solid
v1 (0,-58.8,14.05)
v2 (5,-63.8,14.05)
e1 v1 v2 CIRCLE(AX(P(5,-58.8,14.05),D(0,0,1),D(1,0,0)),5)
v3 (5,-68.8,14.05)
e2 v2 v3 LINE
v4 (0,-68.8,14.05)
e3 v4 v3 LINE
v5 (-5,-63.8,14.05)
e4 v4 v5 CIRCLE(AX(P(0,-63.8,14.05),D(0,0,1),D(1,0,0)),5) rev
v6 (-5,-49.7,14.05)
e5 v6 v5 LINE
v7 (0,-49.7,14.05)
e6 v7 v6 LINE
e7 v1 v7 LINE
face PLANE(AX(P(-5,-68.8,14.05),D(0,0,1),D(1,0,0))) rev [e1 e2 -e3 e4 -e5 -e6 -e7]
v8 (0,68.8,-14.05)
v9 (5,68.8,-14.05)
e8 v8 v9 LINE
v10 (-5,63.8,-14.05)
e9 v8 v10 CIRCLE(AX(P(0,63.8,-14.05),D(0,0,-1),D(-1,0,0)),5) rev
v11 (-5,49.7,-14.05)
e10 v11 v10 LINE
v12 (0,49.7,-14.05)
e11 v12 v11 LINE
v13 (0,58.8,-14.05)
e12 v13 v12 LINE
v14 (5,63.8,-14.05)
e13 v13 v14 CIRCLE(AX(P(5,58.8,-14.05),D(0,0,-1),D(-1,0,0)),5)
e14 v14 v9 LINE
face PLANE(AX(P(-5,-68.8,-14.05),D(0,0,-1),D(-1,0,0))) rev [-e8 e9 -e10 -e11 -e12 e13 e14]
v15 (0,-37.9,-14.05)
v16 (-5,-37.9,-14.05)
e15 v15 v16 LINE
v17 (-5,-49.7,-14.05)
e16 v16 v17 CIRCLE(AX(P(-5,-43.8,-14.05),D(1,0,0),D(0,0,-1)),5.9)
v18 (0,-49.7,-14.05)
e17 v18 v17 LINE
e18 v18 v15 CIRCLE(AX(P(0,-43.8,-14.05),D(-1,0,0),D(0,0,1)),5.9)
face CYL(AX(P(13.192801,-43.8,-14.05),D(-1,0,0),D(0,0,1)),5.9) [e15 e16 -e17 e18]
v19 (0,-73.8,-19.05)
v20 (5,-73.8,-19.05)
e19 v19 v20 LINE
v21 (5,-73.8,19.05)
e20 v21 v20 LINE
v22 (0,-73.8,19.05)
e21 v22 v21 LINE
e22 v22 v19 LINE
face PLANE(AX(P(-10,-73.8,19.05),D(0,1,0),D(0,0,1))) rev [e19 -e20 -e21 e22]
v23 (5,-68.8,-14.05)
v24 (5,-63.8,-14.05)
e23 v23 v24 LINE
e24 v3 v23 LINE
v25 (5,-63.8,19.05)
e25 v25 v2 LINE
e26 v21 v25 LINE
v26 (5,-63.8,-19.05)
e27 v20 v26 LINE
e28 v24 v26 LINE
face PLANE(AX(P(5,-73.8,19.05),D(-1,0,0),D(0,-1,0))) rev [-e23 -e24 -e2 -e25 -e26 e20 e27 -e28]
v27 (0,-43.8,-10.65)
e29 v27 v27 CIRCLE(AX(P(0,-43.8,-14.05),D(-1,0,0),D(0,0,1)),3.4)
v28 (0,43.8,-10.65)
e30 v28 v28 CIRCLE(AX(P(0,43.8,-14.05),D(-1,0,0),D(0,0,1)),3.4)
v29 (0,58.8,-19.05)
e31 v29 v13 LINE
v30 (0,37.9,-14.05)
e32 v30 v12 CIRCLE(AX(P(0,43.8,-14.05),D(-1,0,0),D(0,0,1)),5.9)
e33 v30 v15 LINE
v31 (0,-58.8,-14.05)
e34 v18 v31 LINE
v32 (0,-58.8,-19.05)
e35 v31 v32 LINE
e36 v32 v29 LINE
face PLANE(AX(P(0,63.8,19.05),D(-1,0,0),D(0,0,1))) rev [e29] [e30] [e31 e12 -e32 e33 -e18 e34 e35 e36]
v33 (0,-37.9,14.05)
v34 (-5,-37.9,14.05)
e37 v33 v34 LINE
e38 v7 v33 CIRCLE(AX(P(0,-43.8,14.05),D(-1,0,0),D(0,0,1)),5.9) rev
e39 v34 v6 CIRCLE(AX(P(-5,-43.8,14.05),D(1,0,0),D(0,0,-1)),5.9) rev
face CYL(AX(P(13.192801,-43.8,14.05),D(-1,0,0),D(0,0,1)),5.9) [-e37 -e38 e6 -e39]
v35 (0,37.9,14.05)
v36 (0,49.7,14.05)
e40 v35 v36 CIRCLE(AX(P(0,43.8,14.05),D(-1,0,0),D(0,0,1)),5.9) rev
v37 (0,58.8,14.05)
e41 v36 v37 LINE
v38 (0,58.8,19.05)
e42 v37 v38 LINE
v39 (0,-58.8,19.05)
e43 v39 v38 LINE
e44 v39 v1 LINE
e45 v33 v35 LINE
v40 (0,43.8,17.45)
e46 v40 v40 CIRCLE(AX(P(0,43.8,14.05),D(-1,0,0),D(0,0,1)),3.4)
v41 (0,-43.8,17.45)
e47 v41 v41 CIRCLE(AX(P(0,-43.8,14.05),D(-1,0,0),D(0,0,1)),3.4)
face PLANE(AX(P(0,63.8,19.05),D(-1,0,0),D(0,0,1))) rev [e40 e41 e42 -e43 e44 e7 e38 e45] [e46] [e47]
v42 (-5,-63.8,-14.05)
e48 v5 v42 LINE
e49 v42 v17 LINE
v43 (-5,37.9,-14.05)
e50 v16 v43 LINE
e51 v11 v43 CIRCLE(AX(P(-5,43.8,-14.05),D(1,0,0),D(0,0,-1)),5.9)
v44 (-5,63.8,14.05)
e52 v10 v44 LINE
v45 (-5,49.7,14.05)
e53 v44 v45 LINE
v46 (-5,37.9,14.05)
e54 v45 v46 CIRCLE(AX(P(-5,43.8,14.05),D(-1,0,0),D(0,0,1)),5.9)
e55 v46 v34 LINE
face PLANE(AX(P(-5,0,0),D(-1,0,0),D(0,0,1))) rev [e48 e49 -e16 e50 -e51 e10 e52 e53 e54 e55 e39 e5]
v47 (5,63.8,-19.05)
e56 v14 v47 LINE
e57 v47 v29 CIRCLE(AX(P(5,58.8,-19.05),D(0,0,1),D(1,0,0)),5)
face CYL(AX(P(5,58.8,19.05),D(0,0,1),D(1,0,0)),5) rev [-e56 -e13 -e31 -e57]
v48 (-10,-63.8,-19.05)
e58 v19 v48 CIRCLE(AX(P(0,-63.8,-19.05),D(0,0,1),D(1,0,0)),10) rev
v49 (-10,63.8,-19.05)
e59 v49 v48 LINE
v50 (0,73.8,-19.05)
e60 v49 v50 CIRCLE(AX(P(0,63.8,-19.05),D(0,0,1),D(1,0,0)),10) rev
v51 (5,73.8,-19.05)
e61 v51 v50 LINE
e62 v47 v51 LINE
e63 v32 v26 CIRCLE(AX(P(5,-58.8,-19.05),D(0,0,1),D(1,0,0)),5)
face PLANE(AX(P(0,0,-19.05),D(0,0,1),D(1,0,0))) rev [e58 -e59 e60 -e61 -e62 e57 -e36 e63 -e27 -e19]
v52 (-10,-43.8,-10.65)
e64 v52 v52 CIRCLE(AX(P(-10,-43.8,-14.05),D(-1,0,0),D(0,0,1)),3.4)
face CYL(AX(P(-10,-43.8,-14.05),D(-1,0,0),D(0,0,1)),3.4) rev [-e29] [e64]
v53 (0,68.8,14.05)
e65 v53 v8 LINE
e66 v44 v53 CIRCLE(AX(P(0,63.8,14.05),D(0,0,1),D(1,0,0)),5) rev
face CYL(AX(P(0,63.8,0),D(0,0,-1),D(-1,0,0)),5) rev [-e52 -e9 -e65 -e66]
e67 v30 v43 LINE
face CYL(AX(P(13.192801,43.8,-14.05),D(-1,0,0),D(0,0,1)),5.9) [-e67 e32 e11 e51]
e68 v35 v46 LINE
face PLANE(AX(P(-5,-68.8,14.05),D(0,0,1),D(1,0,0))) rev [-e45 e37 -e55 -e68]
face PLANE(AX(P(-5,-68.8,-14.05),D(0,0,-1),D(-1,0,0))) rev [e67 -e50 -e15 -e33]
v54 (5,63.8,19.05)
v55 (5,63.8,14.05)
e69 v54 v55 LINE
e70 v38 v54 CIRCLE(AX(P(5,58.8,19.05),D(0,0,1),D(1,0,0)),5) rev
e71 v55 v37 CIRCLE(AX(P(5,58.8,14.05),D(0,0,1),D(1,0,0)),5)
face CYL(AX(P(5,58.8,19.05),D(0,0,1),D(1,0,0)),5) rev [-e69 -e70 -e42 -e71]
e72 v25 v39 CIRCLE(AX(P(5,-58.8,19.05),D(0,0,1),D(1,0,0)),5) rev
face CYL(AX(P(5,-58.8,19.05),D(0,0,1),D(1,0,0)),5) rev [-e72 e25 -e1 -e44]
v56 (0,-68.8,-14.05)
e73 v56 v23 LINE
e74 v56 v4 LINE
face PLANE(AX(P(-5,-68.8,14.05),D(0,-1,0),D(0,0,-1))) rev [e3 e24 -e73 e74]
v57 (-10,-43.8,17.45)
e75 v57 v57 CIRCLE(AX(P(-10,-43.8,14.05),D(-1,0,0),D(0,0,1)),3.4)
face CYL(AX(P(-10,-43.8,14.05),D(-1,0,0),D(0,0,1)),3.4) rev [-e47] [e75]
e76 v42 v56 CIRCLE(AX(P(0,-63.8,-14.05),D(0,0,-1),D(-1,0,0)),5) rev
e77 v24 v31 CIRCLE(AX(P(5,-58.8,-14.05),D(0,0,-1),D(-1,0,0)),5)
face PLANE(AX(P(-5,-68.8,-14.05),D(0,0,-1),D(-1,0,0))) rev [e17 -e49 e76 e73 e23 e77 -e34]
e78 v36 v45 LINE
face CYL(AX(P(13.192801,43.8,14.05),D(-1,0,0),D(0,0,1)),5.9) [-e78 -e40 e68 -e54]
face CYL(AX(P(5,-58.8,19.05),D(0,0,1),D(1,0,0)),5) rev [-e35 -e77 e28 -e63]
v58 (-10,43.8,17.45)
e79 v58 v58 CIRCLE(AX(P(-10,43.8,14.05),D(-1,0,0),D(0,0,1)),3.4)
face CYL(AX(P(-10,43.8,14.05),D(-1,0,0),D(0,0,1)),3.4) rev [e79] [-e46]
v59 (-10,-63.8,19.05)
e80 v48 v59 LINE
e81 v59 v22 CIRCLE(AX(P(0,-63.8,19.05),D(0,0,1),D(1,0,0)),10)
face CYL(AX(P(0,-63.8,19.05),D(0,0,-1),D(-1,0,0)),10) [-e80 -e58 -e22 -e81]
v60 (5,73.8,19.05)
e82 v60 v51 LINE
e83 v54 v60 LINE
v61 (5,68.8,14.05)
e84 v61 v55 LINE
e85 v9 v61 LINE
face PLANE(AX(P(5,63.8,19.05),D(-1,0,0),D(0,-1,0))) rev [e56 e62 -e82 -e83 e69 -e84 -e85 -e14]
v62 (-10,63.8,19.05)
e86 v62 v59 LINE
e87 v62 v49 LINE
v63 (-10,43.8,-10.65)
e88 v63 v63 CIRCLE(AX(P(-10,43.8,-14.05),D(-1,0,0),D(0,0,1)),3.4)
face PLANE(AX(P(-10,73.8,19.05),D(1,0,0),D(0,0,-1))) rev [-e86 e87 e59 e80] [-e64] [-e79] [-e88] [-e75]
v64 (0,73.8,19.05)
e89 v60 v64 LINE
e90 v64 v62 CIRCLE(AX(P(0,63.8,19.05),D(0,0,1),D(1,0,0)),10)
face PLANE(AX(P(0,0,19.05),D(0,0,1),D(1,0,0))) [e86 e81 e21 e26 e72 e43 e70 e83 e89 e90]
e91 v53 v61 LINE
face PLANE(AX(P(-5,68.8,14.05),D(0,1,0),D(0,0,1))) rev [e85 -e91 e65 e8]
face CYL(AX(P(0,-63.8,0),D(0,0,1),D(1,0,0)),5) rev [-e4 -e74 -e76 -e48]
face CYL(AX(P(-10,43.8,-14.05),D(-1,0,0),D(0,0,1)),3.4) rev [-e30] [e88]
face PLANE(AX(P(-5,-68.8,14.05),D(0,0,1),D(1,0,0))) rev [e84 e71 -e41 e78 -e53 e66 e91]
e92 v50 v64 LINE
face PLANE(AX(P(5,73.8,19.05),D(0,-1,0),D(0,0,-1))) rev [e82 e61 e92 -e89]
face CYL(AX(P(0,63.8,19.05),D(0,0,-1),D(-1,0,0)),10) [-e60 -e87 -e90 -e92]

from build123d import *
from build123d.topology import SkipClean

# Parameters (mm, degrees)
BOSS_EXTRUDE1_DEPTH              = 19.05
CUT_EXTRUDE1_DEPTH               = 77.872247918
CUT_EXTRUDE1_DEPTH_BACK          = 5
SKETCH3_W                        = 28.1
SKETCH3_H                        = 137.6
FILLET1_R                        = 5
FILLET2_R                        = 10
TAP_DRILL_FOR_M8X1_25_TAP1_D     = 6.8
TAP_DRILL_FOR_M8X1_25_TAP1_DEPTH = 12
TAP_DRILL_FOR_M8X1_25_TAP1_TIP   = 2.042926105
BOSS_EXTRUDE2_START              = 5
BOSS_EXTRUDE2_DEPTH              = 5


with BuildPart() as part:
    # Sketch1 → Boss-Extrude1 (new, symmetric)
    with BuildSketch(Plane.XY):
        Polygon((0, 63.8), (0, -63.8), (5, -63.8), (5, -73.8), (-10, -73.8), (-10, 73.8), (5, 73.8), (5, 63.8), align=None)
    extrude(amount=BOSS_EXTRUDE1_DEPTH, both=True)

    # Sketch3 → Cut-Extrude1 (cut, two sides: drawn at the far end of the back side and taken through both)
    with BuildSketch(Plane(origin=(0, 0, 0), x_dir=(0, 0, -1), z_dir=(1, 0, 0)).offset(-CUT_EXTRUDE1_DEPTH_BACK)):
        Rectangle(SKETCH3_W, SKETCH3_H)
    extrude(amount=CUT_EXTRUDE1_DEPTH + CUT_EXTRUDE1_DEPTH_BACK, mode=Mode.SUBTRACT)

    # Fillet1
    fillet1_edges = [part.edges().sort_by_distance(p)[0] for p in [
        (0, -63.8, 16.55),
        (0, -63.8, -16.55),
        (0, 63.8, 16.55),
        (0, 63.8, -16.55),
        (-5, -68.8, 0),
        (-5, 68.8, 0),
    ]]
    fillet(fillet1_edges, radius=FILLET1_R - 0.0001)  # a hair under: the kernel refuses the full size

    # Fillet2
    fillet2_edges = [part.edges().sort_by_distance(p)[0] for p in [
        (-10, -73.8, 0),
        (-10, 73.8, 0),
    ]]
    fillet(fillet2_edges, radius=FILLET2_R)

    # Tap Drill for M8x1.25 Tap1
    with Locations(Plane.ZY.offset(10)):
        with Locations((-14.05, 43.8), (14.05, 43.8), (-14.05, -43.8), (14.05, -43.8)):
            Hole(TAP_DRILL_FOR_M8X1_25_TAP1_D / 2, depth=TAP_DRILL_FOR_M8X1_25_TAP1_DEPTH)
            with Locations((0, 0, -(TAP_DRILL_FOR_M8X1_25_TAP1_DEPTH + TAP_DRILL_FOR_M8X1_25_TAP1_TIP / 2))):  # 118° drill point
                Cone(0, TAP_DRILL_FOR_M8X1_25_TAP1_D / 2, TAP_DRILL_FOR_M8X1_25_TAP1_TIP, mode=Mode.SUBTRACT)

    # Sketch6 → Boss-Extrude2 (add)
    with SkipClean():  # the faces are left unmerged after this step: merging them gives an invalid solid
        with BuildSketch(Plane(origin=(-5, 0, 0), x_dir=(0, 0, -1), z_dir=(1, 0, 0)).offset(BOSS_EXTRUDE2_START)):
            with BuildLine():
                Line((14.05, -40.4), (14.05, -37.9))
                ThreePointArc((14.05, -37.9), (8.15, -43.8), (14.05, -49.7))
                Line((14.05, -49.7), (14.05, -47.2))
                ThreePointArc((14.05, -47.2), (10.65, -43.8), (14.05, -40.4))
            make_face()
            with BuildLine():
                ThreePointArc((-14.05, -49.7), (-8.15, -43.8), (-14.05, -37.9))
                Line((-14.05, -37.9), (-14.05, -40.4))
                ThreePointArc((-14.05, -40.4), (-10.65, -43.8), (-14.05, -47.2))
                Line((-14.05, -47.2), (-14.05, -49.7))
            make_face()
            with BuildLine():
                Line((14.05, 47.2), (14.05, 49.7))
                ThreePointArc((14.05, 49.7), (8.15, 43.8), (14.05, 37.9))
                Line((14.05, 37.9), (14.05, 40.4))
                ThreePointArc((14.05, 40.4), (10.65, 43.8), (14.05, 47.2))
            make_face()
            with BuildLine():
                ThreePointArc((-14.05, 49.7), (-8.15, 43.8), (-14.05, 37.9))
                Line((-14.05, 37.9), (-14.05, 40.4))
                ThreePointArc((-14.05, 40.4), (-10.65, 43.8), (-14.05, 47.2))
                Line((-14.05, 47.2), (-14.05, 49.7))
            make_face()
        extrude(amount=-BOSS_EXTRUDE2_DEPTH)


solid = part.part
